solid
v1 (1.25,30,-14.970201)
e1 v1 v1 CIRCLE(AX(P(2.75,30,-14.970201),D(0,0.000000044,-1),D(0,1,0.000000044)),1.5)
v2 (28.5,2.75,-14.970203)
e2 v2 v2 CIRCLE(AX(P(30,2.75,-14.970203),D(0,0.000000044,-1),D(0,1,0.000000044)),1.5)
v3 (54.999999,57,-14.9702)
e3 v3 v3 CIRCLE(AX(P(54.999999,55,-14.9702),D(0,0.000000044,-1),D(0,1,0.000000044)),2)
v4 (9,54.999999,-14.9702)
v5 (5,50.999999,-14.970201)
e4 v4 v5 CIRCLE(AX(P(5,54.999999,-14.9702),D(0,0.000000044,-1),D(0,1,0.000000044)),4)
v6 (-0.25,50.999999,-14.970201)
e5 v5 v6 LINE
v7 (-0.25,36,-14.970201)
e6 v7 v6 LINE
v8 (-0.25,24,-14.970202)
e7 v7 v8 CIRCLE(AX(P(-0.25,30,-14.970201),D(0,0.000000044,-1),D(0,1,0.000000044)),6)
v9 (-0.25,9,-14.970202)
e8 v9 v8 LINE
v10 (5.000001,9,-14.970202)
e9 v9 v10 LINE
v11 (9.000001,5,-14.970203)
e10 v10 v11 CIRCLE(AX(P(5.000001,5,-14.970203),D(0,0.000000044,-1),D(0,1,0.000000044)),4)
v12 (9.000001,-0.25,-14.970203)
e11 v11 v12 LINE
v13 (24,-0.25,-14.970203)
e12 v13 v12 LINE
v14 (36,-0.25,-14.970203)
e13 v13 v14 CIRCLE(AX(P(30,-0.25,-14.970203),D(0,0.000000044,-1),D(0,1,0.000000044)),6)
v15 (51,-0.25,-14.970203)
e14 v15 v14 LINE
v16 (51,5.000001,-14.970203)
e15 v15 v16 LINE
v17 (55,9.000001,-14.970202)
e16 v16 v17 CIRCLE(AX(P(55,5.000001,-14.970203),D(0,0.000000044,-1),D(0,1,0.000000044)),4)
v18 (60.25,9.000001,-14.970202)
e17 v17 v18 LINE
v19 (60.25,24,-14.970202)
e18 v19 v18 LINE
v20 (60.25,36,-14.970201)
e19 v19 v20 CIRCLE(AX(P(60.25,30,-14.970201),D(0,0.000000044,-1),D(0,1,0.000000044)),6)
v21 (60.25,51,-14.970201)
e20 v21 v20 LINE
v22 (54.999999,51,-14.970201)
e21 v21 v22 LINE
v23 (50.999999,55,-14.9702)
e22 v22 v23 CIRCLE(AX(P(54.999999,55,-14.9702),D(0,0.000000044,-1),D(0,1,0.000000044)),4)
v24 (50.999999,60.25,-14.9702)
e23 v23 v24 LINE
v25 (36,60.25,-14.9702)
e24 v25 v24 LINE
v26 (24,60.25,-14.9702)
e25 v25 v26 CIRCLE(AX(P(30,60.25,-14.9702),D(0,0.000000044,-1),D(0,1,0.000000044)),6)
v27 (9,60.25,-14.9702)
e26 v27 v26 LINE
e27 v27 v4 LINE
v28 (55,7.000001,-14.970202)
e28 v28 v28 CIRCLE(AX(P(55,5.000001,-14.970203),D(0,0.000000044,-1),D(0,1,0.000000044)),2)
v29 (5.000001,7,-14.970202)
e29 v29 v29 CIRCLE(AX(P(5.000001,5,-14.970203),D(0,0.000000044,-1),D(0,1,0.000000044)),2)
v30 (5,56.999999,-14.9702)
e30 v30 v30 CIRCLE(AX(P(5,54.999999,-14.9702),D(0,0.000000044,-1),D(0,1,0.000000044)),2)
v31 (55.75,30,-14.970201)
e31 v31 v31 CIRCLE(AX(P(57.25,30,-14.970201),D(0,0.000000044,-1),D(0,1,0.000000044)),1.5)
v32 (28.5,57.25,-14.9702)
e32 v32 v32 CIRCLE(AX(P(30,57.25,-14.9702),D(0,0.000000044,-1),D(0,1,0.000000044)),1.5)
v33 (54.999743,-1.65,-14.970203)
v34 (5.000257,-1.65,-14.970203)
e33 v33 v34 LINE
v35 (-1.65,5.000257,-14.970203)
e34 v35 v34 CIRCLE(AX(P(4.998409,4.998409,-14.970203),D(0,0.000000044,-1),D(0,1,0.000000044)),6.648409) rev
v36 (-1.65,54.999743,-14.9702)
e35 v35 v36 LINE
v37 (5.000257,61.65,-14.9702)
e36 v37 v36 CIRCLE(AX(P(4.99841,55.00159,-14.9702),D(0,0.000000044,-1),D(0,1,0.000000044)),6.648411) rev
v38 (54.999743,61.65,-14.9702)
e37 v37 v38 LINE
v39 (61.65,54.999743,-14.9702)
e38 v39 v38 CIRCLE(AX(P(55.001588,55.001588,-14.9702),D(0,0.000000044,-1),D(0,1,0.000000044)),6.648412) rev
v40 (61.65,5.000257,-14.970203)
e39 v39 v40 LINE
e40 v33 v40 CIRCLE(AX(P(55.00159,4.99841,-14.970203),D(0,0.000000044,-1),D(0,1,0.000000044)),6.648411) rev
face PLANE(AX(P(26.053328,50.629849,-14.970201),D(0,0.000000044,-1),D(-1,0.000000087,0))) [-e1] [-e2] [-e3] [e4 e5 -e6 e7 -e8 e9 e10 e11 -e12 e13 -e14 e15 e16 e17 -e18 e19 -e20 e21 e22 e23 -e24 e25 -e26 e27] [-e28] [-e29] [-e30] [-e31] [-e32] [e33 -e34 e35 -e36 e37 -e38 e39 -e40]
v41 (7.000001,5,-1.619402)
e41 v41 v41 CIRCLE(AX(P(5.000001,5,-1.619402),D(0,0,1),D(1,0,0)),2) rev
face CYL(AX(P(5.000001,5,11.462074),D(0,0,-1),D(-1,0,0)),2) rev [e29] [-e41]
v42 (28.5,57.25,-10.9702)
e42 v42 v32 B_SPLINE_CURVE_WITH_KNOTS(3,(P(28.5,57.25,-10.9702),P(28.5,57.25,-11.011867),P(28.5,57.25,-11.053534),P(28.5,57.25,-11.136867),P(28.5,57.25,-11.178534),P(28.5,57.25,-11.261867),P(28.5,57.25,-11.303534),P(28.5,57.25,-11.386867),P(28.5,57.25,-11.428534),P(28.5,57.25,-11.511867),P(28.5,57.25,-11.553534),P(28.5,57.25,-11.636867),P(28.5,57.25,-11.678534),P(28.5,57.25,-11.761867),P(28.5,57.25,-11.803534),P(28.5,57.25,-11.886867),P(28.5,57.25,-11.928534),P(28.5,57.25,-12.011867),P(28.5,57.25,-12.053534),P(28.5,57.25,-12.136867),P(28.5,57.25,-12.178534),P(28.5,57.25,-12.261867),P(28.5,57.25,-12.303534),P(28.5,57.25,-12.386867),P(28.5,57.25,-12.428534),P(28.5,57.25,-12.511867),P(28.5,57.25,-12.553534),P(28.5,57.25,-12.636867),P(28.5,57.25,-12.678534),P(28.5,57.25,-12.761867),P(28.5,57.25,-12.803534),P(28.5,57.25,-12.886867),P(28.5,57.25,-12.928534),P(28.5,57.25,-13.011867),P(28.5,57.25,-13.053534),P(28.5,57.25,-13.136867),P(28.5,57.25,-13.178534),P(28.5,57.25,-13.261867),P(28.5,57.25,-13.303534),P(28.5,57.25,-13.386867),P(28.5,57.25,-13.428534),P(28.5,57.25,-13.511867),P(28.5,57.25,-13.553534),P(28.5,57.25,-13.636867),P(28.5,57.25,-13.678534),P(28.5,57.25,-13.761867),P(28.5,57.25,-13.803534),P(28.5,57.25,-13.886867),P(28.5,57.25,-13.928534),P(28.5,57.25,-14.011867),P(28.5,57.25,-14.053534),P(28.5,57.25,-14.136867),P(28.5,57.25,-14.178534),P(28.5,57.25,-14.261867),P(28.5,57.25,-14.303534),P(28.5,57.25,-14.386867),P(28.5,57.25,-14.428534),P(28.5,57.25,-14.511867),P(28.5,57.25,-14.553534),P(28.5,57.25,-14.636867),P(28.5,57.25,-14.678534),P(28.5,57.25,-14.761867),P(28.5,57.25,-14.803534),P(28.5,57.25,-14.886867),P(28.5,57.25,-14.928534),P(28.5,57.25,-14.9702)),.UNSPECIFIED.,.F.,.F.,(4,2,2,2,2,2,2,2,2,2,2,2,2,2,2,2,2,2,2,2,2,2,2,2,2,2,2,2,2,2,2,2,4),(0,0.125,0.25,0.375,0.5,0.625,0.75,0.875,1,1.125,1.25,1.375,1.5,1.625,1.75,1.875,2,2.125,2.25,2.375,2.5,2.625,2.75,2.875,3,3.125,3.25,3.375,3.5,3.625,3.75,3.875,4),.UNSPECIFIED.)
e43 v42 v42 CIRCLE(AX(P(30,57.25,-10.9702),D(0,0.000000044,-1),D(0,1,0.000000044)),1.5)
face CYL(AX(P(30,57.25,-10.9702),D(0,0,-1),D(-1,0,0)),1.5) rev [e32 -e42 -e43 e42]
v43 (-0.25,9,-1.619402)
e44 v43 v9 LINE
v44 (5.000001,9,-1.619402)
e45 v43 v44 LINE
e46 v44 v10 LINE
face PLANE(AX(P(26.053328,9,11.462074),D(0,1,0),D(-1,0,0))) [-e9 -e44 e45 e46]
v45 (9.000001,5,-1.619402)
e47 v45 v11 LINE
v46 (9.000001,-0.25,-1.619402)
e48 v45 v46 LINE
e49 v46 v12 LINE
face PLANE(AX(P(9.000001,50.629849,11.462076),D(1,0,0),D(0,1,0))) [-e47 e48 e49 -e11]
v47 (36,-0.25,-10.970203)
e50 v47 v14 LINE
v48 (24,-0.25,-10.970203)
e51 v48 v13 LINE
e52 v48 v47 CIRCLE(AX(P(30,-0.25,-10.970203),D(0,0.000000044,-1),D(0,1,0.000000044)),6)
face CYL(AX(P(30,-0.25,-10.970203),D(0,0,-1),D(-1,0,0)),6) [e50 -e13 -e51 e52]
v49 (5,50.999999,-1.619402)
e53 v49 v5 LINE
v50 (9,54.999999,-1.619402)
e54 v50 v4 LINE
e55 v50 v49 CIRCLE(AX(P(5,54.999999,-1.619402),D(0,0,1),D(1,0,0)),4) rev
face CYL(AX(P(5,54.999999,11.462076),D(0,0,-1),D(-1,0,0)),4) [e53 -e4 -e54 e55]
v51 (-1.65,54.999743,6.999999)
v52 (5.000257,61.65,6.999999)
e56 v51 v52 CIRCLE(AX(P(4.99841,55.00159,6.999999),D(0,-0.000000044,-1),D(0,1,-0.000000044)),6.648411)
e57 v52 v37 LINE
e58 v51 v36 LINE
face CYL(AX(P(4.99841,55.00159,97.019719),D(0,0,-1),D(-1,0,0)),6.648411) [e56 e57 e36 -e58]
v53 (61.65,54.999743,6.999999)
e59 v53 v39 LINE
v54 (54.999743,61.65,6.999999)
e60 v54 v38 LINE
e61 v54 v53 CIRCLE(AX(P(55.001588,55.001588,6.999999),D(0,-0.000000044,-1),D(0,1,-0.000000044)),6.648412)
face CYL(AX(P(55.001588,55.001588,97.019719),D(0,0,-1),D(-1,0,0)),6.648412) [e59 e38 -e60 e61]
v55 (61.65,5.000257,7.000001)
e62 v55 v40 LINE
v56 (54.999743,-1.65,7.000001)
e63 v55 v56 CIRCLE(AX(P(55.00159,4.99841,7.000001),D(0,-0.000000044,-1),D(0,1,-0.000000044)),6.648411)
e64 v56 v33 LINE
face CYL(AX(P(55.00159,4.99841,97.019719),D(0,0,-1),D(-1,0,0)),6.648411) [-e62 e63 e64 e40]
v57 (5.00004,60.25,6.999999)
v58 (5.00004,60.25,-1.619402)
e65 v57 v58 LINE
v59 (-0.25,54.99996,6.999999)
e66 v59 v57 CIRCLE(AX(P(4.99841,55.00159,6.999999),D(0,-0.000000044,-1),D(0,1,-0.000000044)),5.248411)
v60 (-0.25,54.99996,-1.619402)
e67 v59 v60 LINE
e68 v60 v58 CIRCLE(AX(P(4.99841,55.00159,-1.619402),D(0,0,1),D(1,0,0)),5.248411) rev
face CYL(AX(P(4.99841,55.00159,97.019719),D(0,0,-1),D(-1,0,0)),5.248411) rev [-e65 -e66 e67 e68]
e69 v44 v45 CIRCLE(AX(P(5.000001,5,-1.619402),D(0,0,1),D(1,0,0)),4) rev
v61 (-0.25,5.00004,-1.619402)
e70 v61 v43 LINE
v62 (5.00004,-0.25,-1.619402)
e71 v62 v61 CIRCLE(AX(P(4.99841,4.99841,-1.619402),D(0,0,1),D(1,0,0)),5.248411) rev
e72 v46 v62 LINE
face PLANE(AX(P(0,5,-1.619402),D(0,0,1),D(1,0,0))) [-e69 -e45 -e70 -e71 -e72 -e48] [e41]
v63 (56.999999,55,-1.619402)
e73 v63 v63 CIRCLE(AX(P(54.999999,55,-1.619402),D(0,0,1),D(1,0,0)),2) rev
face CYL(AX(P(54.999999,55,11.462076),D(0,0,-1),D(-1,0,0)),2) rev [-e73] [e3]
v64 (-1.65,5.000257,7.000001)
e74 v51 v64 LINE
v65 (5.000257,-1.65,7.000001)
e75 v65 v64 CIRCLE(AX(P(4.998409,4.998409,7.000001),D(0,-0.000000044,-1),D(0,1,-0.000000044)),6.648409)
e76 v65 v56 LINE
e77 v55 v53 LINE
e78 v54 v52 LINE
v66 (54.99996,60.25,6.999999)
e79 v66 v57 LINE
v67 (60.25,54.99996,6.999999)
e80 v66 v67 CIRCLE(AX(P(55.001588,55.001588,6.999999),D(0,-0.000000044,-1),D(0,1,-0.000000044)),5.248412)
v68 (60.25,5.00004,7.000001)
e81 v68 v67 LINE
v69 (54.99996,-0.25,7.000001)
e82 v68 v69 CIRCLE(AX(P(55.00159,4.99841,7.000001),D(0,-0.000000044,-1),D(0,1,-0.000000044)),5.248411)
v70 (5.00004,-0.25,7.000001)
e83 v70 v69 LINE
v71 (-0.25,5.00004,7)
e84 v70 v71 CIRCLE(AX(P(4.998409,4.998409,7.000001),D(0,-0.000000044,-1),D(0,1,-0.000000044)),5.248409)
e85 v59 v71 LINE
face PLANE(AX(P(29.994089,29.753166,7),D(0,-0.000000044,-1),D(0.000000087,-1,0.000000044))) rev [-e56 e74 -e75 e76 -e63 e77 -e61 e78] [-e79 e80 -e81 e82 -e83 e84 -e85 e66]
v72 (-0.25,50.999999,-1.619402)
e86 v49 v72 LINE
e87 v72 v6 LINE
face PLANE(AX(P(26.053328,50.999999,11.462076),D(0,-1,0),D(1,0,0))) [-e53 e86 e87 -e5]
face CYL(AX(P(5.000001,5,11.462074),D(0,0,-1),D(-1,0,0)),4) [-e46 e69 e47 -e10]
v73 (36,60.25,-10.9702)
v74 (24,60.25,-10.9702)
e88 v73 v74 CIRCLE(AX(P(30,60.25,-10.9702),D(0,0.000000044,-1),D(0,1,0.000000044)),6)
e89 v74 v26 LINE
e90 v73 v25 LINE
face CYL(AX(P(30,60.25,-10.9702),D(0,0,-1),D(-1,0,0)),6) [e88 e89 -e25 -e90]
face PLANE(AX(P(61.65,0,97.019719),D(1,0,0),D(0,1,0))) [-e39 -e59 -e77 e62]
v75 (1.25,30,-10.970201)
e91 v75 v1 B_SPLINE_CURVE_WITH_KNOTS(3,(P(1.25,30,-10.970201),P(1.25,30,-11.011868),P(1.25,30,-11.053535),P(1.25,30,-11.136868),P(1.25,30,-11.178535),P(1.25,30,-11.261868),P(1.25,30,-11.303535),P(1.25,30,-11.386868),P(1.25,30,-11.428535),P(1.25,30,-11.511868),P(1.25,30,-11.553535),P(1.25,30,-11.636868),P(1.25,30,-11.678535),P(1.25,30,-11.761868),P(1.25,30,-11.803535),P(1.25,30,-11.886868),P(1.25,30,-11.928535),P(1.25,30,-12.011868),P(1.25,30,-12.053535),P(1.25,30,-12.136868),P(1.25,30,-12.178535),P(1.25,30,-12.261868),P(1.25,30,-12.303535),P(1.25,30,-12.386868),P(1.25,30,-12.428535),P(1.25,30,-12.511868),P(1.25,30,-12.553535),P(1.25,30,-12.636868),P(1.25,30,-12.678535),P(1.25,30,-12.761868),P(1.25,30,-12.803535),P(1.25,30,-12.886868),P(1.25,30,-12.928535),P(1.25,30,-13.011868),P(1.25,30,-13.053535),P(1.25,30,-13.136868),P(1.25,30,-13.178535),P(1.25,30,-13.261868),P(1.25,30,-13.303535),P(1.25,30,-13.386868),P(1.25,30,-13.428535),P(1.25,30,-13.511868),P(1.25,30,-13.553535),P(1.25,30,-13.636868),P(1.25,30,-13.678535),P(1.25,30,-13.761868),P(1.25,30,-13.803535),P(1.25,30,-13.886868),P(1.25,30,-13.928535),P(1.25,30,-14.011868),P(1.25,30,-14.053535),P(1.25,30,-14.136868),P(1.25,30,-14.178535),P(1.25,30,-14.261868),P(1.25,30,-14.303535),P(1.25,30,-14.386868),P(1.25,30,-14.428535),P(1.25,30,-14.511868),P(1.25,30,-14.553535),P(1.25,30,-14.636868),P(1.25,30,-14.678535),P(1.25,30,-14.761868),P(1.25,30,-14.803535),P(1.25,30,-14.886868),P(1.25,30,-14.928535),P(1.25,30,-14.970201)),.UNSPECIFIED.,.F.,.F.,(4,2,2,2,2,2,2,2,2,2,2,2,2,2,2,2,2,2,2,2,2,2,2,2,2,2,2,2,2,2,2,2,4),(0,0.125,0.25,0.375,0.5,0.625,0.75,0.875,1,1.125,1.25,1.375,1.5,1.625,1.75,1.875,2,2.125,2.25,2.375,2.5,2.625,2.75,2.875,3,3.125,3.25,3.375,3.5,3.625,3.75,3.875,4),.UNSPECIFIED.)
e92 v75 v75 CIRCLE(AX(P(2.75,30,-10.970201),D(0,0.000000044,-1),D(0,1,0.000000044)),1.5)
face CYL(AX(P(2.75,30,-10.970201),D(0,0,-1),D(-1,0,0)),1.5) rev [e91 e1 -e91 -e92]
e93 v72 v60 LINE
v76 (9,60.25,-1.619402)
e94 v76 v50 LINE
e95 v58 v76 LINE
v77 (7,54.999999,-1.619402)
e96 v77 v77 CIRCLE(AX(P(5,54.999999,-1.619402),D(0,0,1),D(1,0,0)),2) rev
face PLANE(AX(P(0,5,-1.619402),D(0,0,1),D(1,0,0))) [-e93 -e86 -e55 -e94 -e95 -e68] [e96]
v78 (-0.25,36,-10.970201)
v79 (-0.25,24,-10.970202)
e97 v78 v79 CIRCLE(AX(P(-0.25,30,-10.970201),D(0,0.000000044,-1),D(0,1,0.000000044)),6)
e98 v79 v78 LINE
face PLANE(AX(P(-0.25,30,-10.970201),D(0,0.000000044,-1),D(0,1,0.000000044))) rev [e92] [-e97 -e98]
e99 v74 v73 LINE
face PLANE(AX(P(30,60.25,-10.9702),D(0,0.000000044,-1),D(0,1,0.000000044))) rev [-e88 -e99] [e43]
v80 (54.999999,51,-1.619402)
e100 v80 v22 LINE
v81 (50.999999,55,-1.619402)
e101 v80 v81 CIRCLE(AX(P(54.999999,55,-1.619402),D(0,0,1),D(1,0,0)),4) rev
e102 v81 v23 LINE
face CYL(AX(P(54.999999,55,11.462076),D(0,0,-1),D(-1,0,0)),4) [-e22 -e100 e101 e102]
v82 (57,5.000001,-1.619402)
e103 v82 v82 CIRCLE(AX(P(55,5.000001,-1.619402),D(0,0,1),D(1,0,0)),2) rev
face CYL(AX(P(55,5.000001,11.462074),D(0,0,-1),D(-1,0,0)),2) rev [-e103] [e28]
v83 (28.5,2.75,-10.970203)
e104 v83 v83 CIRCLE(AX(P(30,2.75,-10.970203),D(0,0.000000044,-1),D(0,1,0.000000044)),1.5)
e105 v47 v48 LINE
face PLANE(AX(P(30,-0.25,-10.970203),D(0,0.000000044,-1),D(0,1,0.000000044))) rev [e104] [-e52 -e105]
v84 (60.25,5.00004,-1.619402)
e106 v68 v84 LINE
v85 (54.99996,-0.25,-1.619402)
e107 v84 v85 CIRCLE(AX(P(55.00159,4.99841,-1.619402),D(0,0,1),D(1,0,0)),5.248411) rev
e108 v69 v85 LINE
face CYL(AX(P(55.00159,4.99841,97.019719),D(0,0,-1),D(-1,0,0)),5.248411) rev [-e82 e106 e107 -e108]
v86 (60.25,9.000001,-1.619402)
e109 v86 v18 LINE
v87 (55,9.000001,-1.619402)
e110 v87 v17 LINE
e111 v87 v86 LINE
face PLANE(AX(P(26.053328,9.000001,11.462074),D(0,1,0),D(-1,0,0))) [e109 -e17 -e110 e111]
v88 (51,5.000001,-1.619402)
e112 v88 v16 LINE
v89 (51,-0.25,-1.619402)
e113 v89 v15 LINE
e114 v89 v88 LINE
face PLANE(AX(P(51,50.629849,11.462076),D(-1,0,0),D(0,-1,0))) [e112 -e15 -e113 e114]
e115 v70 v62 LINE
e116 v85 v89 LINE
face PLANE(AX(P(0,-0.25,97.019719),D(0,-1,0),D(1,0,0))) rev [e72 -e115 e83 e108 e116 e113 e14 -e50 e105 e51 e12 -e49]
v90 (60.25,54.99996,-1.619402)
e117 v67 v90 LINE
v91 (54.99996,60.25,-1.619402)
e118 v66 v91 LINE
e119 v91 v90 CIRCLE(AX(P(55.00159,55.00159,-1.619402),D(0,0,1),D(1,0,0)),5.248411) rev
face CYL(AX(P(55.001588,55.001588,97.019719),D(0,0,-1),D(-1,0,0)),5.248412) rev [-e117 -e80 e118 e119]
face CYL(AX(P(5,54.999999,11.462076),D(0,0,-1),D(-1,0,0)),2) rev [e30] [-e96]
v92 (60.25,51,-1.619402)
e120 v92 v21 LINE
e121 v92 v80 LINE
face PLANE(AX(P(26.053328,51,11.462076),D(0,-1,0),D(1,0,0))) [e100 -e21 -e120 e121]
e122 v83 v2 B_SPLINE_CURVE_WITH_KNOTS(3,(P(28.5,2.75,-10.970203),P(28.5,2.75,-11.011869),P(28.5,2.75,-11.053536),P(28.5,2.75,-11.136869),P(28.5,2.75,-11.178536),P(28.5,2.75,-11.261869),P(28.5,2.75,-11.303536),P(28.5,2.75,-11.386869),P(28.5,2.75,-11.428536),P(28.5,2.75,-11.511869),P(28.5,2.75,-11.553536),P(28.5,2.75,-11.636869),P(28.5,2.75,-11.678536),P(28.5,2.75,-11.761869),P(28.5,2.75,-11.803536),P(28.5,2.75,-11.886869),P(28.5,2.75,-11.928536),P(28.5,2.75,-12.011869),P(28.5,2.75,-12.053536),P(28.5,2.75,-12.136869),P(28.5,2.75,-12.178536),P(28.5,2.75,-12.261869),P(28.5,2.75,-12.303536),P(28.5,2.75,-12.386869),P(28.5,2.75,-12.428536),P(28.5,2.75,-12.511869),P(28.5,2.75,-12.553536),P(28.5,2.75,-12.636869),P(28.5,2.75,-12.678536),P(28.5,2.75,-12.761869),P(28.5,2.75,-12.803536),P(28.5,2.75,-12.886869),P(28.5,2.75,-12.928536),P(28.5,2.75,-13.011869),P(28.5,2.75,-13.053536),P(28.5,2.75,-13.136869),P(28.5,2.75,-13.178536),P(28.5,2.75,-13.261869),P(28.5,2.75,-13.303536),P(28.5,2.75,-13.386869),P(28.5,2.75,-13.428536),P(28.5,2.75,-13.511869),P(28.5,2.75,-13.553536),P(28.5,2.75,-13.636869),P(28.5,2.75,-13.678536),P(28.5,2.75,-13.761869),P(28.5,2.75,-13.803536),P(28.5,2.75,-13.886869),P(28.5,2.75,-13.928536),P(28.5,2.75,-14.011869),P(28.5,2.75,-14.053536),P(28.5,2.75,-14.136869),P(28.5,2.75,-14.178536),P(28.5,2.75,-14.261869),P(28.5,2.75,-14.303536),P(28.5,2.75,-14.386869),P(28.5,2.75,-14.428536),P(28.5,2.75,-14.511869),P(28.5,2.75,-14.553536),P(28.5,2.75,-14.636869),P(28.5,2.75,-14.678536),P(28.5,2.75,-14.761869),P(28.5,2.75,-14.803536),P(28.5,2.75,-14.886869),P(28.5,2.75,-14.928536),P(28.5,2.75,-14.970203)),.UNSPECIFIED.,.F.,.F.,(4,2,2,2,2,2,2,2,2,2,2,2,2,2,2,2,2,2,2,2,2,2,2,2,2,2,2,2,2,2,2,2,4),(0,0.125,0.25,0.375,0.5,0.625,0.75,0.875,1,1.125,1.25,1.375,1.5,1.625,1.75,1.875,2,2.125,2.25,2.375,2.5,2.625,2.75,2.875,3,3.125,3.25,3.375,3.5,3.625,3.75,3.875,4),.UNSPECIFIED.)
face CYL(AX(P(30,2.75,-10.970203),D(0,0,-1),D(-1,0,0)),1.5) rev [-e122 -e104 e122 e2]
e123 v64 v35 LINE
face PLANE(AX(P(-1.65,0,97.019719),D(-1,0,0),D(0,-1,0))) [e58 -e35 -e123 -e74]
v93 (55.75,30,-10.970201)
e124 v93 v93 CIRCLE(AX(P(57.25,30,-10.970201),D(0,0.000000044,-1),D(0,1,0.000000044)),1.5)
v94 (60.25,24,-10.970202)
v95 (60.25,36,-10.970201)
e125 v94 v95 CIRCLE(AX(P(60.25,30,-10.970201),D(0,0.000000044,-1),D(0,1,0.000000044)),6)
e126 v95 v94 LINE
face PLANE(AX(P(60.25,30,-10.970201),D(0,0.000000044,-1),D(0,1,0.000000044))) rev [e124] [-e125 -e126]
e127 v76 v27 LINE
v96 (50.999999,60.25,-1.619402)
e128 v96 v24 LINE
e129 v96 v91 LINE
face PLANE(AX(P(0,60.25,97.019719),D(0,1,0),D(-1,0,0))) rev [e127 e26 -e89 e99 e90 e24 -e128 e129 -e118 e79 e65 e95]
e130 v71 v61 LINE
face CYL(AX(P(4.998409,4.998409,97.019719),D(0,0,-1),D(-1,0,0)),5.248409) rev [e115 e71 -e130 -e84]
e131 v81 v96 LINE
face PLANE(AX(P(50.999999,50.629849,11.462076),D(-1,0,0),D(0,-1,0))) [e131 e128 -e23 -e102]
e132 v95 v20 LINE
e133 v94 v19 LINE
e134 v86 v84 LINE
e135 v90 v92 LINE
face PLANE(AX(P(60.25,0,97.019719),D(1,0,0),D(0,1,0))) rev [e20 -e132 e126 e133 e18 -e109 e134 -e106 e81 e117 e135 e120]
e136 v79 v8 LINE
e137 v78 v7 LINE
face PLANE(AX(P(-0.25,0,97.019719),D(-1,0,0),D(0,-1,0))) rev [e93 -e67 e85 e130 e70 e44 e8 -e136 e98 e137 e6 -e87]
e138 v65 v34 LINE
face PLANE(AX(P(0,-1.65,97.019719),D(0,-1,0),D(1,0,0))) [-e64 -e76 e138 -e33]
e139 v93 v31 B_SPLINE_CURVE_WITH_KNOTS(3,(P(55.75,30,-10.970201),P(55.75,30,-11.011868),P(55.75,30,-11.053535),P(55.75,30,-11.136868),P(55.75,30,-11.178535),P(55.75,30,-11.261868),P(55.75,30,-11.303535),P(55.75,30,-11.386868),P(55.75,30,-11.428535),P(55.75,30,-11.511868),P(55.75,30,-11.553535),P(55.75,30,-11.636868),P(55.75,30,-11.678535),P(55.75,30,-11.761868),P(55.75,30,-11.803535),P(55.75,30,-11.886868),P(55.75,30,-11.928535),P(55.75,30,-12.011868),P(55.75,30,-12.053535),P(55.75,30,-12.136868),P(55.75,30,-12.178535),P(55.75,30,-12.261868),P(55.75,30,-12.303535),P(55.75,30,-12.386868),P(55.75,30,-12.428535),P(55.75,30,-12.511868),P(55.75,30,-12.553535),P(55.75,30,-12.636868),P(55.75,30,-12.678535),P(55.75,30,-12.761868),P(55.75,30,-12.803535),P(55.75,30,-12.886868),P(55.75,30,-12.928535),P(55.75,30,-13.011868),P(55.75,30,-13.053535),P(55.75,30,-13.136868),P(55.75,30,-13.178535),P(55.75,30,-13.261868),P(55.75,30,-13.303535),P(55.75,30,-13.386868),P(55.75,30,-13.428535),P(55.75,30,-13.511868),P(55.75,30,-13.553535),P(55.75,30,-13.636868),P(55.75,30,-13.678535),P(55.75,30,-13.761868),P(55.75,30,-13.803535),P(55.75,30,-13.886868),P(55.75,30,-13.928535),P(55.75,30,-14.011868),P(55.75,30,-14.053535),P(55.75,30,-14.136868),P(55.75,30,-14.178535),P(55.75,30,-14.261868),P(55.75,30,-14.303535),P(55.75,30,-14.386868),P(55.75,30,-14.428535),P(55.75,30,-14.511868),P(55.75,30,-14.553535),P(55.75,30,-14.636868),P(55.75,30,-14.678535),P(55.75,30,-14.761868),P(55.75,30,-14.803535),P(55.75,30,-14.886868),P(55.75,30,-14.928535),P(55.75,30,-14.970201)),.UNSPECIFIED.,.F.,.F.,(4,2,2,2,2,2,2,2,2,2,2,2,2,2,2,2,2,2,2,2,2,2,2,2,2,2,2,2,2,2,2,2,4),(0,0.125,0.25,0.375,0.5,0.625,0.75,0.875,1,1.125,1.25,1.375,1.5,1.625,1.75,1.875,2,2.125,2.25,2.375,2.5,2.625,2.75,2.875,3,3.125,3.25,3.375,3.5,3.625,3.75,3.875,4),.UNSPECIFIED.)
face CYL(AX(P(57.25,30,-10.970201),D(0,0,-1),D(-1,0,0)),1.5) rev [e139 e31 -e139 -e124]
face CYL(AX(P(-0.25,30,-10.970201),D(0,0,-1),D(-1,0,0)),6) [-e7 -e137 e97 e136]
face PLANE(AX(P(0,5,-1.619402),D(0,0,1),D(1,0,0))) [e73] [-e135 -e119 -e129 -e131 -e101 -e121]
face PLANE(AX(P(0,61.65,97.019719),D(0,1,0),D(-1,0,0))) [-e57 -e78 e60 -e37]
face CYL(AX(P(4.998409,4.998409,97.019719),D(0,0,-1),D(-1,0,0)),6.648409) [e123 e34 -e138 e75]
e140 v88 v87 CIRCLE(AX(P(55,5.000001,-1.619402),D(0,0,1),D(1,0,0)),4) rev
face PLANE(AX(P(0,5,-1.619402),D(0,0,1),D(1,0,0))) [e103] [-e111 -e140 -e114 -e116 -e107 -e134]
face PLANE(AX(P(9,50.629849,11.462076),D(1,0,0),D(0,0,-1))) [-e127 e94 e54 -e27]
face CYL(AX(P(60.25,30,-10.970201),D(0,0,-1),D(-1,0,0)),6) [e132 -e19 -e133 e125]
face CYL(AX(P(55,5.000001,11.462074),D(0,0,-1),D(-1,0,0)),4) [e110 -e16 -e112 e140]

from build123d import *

# Parameters (mm, degrees)
BOSS_EXTRUDE1_DEPTH      = 7
BOSS_EXTRUDE1_DEPTH_BACK = 14.970201
BOSS_EXTRUDE2_START      = -14.970201
SKETCH2_R                = 2
BOSS_EXTRUDE2_DEPTH      = 13.350798149
BOSS_EXTRUDE3_START      = -14.970203
SKETCH3_R                = 1.5
BOSS_EXTRUDE3_DEPTH      = 4.000003


with BuildPart() as part:
    # Sketch1 → Boss-Extrude1 (new, two sides: drawn at the far end of the back side and taken through both)
    with BuildSketch(Plane.XY.offset(-BOSS_EXTRUDE1_DEPTH_BACK)):
        with BuildLine():
            Line((54.999742941, -1.649999966), (5.000257256, -1.649999966))
            ThreePointArc((5.000257256, -1.649999966), (0.297273819, 0.297273819), (-1.649999966, 5.000257256))
            Line((-1.649999966, 5.000257256), (-1.649999966, 54.999742941))
            ThreePointArc((-1.649999966, 54.999742941), (0.297274177, 59.702725823), (5.000257059, 61.649999966))
            Line((5.000257059, 61.649999966), (54.999743139, 61.649999966))
            ThreePointArc((54.999743139, 61.649999966), (59.702725466, 59.702725466), (61.649999966, 54.999743139))
            Line((61.649999966, 54.999743139), (61.649999966, 5.000257059))
            ThreePointArc((61.649999966, 5.000257059), (59.702725823, 0.297274177), (54.999742941, -1.649999966))
        make_face()
        with BuildLine():
            ThreePointArc((5.000039752, 60.249999994), (1.287223653, 58.712776347), (-0.249999994, 54.999960248))
            Line((-0.249999994, 54.999960248), (-0.249999994, 5.000039782))
            ThreePointArc((-0.249999994, 5.000039782), (1.287223296, 1.287223296), (5.000039782, -0.249999994))
            Line((5.000039782, -0.249999994), (54.999960248, -0.249999994))
            ThreePointArc((54.999960248, -0.249999994), (58.712776347, 1.287223653), (60.249999994, 5.000039752))
            Line((60.249999994, 5.000039752), (60.249999994, 54.999960279))
            ThreePointArc((60.249999994, 54.999960279), (58.712775989, 58.712775989), (54.999960279, 60.249999994))
            Line((54.999960279, 60.249999994), (5.000039752, 60.249999994))
        make_face(mode=Mode.SUBTRACT)
    extrude(amount=BOSS_EXTRUDE1_DEPTH + BOSS_EXTRUDE1_DEPTH_BACK)


with BuildPart() as boss_extrude2_tool:
    # Sketch2 → Boss-Extrude2 (new body)
    # profile 1 of 4: a face of its own
    with BuildSketch(Plane.XY.offset(BOSS_EXTRUDE2_START)):
        with BuildLine():
            Line((9.00000016, 54.99999922), (9.00000016, 60.249999994))
            Line((9.00000016, 60.249999994), (5.000039752, 60.249999994))
            add(Edge.make_bspline(
                [(-0.249999994, 54.999960248), (-0.250954892, 58.075921633), (1.924078367, 60.250954892), (5.000039752, 60.249999994)],
                knots=[0, 0, 0, 0, 1, 1, 1, 1], degree=3, weights=[1, 0.804591489, 0.804591489, 1]))
            Line((-0.249999994, 54.999960248), (-0.249999994, 50.99999922))
            Line((-0.249999994, 50.99999922), (5.00000016, 50.99999922))
            ThreePointArc((5.00000016, 50.99999922), (7.828427285, 52.171572095), (9.00000016, 54.99999922))
        make_face()
        with Locations(Location((5.00000016, 54.99999922, 0), (0, 0, 90))):
            Circle(SKETCH2_R, mode=Mode.SUBTRACT)
    # profile 2 of 4: a face of its own
    with BuildSketch(Plane.XY.offset(BOSS_EXTRUDE2_START)):
        with BuildLine():
            Line((50.99999922, 54.99999984), (50.99999922, 60.249999994))
            Line((50.99999922, 60.249999994), (54.999960248, 60.249999994))
            add(Edge.make_bspline(
                [(54.999960248, 60.249999994), (58.075921633, 60.250954892), (60.250954892, 58.075921633), (60.249999994, 54.999960248)],
                knots=[0, 0, 0, 0, 1, 1, 1, 1], degree=3, weights=[1, 0.804591489, 0.804591489, 1]))
            Line((60.249999994, 54.999960248), (60.249999994, 50.99999984))
            Line((60.249999994, 50.99999984), (54.99999922, 50.99999984))
            ThreePointArc((54.99999922, 50.99999984), (52.171572095, 52.171572715), (50.99999922, 54.99999984))
        make_face()
        with Locations(Location((54.99999922, 54.99999984, 0), (0, 0, 90))):
            Circle(SKETCH2_R, mode=Mode.SUBTRACT)
    # profile 3 of 4: a face of its own
    with BuildSketch(Plane.XY.offset(BOSS_EXTRUDE2_START)):
        with BuildLine():
            Line((54.99999984, 9.00000078), (60.249999994, 9.00000078))
            Line((60.249999994, 9.00000078), (60.249999994, 5.000039752))
            add(Edge.make_bspline(
                [(60.249999994, 5.000039752), (60.250954892, 1.924078367), (58.075921633, -0.250954892), (54.999960248, -0.249999994)],
                knots=[0, 0, 0, 0, 1, 1, 1, 1], degree=3, weights=[1, 0.804591489, 0.804591489, 1]))
            Line((54.999960248, -0.249999994), (50.99999984, -0.249999994))
            Line((50.99999984, -0.249999994), (50.99999984, 5.00000078))
            ThreePointArc((50.99999984, 5.00000078), (52.171572715, 7.828427905), (54.99999984, 9.00000078))
        make_face()
        with Locations(Location((54.99999984, 5.00000078, 0), (0, 0, 90))):
            Circle(SKETCH2_R, mode=Mode.SUBTRACT)
    # profile 4 of 4: a face of its own
    with BuildSketch(Plane.XY.offset(BOSS_EXTRUDE2_START)):
        with BuildLine():
            Line((9.00000078, 5.00000016), (9.00000078, -0.249999994))
            Line((9.00000078, -0.249999994), (5.000039752, -0.249999994))
            add(Edge.make_bspline(
                [(5.000039752, -0.249999994), (1.924078367, -0.250954892), (-0.250954892, 1.924078367), (-0.249999994, 5.000039752)],
                knots=[0, 0, 0, 0, 1, 1, 1, 1], degree=3, weights=[1, 0.804591489, 0.804591489, 1]))
            Line((-0.249999994, 5.000039752), (-0.249999994, 9.00000016))
            Line((-0.249999994, 9.00000016), (5.00000078, 9.00000016))
            ThreePointArc((5.00000078, 9.00000016), (7.828427905, 7.828427285), (9.00000078, 5.00000016))
        make_face()
        with Locations(Location((5.00000078, 5.00000016, 0), (0, 0, 90))):
            Circle(SKETCH2_R, mode=Mode.SUBTRACT)
    extrude(amount=BOSS_EXTRUDE2_DEPTH)


with BuildPart() as part_1:
    add(part.part)


with BuildPart() as part_2:
    # Boss-Extrude2: joined with boss_extrude2_tool
    add(part_1.part.fuse(boss_extrude2_tool.part, tol=0.00001))

    # Sketch3 → Boss-Extrude3 (add)
    # profile 1 of 4: a face of its own
    with BuildSketch(Plane.XY.offset(BOSS_EXTRUDE3_START)):
        with BuildLine():
            Line((60.249999994, 23.999999985), (60.249999994, 35.999999985))
            ThreePointArc((60.249999994, 35.999999985), (54.249999994, 29.999999985), (60.249999994, 23.999999985))
        make_face()
        with Locations(Location((57.249999994, 29.999999985, 0), (0, 0, 180))):
            Circle(SKETCH3_R, mode=Mode.SUBTRACT)
    # profile 2 of 4: a face of its own
    with BuildSketch(Plane.XY.offset(BOSS_EXTRUDE3_START)):
        with BuildLine():
            Line((36.000000015, 60.249999994), (24.000000015, 60.249999994))
            ThreePointArc((24.000000015, 60.249999994), (30.000000015, 54.249999994), (36.000000015, 60.249999994))
        make_face()
        with Locations(Location((30.000000015, 57.249999994, 0), (0, 0, 180))):
            Circle(SKETCH3_R, mode=Mode.SUBTRACT)
    # profile 3 of 4: a face of its own
    with BuildSketch(Plane.XY.offset(BOSS_EXTRUDE3_START)):
        with BuildLine():
            Line((23.999999985, -0.249999994), (35.999999985, -0.249999994))
            ThreePointArc((35.999999985, -0.249999994), (29.999999985, 5.750000006), (23.999999985, -0.249999994))
        make_face()
        with Locations(Location((29.999999985, 2.750000006, 0), (0, 0, 180))):
            Circle(SKETCH3_R, mode=Mode.SUBTRACT)
    # profile 4 of 4: a face of its own
    with BuildSketch(Plane.XY.offset(BOSS_EXTRUDE3_START)):
        with BuildLine():
            Line((-0.249999994, 36.000000015), (-0.249999994, 24.000000015))
            ThreePointArc((-0.249999994, 24.000000015), (5.750000006, 30.000000015), (-0.249999994, 36.000000015))
        make_face()
        with Locations(Location((2.750000006, 30.000000015, 0), (0, 0, 180))):
            Circle(SKETCH3_R, mode=Mode.SUBTRACT)
    extrude(amount=BOSS_EXTRUDE3_DEPTH)


solid = part_2.part
